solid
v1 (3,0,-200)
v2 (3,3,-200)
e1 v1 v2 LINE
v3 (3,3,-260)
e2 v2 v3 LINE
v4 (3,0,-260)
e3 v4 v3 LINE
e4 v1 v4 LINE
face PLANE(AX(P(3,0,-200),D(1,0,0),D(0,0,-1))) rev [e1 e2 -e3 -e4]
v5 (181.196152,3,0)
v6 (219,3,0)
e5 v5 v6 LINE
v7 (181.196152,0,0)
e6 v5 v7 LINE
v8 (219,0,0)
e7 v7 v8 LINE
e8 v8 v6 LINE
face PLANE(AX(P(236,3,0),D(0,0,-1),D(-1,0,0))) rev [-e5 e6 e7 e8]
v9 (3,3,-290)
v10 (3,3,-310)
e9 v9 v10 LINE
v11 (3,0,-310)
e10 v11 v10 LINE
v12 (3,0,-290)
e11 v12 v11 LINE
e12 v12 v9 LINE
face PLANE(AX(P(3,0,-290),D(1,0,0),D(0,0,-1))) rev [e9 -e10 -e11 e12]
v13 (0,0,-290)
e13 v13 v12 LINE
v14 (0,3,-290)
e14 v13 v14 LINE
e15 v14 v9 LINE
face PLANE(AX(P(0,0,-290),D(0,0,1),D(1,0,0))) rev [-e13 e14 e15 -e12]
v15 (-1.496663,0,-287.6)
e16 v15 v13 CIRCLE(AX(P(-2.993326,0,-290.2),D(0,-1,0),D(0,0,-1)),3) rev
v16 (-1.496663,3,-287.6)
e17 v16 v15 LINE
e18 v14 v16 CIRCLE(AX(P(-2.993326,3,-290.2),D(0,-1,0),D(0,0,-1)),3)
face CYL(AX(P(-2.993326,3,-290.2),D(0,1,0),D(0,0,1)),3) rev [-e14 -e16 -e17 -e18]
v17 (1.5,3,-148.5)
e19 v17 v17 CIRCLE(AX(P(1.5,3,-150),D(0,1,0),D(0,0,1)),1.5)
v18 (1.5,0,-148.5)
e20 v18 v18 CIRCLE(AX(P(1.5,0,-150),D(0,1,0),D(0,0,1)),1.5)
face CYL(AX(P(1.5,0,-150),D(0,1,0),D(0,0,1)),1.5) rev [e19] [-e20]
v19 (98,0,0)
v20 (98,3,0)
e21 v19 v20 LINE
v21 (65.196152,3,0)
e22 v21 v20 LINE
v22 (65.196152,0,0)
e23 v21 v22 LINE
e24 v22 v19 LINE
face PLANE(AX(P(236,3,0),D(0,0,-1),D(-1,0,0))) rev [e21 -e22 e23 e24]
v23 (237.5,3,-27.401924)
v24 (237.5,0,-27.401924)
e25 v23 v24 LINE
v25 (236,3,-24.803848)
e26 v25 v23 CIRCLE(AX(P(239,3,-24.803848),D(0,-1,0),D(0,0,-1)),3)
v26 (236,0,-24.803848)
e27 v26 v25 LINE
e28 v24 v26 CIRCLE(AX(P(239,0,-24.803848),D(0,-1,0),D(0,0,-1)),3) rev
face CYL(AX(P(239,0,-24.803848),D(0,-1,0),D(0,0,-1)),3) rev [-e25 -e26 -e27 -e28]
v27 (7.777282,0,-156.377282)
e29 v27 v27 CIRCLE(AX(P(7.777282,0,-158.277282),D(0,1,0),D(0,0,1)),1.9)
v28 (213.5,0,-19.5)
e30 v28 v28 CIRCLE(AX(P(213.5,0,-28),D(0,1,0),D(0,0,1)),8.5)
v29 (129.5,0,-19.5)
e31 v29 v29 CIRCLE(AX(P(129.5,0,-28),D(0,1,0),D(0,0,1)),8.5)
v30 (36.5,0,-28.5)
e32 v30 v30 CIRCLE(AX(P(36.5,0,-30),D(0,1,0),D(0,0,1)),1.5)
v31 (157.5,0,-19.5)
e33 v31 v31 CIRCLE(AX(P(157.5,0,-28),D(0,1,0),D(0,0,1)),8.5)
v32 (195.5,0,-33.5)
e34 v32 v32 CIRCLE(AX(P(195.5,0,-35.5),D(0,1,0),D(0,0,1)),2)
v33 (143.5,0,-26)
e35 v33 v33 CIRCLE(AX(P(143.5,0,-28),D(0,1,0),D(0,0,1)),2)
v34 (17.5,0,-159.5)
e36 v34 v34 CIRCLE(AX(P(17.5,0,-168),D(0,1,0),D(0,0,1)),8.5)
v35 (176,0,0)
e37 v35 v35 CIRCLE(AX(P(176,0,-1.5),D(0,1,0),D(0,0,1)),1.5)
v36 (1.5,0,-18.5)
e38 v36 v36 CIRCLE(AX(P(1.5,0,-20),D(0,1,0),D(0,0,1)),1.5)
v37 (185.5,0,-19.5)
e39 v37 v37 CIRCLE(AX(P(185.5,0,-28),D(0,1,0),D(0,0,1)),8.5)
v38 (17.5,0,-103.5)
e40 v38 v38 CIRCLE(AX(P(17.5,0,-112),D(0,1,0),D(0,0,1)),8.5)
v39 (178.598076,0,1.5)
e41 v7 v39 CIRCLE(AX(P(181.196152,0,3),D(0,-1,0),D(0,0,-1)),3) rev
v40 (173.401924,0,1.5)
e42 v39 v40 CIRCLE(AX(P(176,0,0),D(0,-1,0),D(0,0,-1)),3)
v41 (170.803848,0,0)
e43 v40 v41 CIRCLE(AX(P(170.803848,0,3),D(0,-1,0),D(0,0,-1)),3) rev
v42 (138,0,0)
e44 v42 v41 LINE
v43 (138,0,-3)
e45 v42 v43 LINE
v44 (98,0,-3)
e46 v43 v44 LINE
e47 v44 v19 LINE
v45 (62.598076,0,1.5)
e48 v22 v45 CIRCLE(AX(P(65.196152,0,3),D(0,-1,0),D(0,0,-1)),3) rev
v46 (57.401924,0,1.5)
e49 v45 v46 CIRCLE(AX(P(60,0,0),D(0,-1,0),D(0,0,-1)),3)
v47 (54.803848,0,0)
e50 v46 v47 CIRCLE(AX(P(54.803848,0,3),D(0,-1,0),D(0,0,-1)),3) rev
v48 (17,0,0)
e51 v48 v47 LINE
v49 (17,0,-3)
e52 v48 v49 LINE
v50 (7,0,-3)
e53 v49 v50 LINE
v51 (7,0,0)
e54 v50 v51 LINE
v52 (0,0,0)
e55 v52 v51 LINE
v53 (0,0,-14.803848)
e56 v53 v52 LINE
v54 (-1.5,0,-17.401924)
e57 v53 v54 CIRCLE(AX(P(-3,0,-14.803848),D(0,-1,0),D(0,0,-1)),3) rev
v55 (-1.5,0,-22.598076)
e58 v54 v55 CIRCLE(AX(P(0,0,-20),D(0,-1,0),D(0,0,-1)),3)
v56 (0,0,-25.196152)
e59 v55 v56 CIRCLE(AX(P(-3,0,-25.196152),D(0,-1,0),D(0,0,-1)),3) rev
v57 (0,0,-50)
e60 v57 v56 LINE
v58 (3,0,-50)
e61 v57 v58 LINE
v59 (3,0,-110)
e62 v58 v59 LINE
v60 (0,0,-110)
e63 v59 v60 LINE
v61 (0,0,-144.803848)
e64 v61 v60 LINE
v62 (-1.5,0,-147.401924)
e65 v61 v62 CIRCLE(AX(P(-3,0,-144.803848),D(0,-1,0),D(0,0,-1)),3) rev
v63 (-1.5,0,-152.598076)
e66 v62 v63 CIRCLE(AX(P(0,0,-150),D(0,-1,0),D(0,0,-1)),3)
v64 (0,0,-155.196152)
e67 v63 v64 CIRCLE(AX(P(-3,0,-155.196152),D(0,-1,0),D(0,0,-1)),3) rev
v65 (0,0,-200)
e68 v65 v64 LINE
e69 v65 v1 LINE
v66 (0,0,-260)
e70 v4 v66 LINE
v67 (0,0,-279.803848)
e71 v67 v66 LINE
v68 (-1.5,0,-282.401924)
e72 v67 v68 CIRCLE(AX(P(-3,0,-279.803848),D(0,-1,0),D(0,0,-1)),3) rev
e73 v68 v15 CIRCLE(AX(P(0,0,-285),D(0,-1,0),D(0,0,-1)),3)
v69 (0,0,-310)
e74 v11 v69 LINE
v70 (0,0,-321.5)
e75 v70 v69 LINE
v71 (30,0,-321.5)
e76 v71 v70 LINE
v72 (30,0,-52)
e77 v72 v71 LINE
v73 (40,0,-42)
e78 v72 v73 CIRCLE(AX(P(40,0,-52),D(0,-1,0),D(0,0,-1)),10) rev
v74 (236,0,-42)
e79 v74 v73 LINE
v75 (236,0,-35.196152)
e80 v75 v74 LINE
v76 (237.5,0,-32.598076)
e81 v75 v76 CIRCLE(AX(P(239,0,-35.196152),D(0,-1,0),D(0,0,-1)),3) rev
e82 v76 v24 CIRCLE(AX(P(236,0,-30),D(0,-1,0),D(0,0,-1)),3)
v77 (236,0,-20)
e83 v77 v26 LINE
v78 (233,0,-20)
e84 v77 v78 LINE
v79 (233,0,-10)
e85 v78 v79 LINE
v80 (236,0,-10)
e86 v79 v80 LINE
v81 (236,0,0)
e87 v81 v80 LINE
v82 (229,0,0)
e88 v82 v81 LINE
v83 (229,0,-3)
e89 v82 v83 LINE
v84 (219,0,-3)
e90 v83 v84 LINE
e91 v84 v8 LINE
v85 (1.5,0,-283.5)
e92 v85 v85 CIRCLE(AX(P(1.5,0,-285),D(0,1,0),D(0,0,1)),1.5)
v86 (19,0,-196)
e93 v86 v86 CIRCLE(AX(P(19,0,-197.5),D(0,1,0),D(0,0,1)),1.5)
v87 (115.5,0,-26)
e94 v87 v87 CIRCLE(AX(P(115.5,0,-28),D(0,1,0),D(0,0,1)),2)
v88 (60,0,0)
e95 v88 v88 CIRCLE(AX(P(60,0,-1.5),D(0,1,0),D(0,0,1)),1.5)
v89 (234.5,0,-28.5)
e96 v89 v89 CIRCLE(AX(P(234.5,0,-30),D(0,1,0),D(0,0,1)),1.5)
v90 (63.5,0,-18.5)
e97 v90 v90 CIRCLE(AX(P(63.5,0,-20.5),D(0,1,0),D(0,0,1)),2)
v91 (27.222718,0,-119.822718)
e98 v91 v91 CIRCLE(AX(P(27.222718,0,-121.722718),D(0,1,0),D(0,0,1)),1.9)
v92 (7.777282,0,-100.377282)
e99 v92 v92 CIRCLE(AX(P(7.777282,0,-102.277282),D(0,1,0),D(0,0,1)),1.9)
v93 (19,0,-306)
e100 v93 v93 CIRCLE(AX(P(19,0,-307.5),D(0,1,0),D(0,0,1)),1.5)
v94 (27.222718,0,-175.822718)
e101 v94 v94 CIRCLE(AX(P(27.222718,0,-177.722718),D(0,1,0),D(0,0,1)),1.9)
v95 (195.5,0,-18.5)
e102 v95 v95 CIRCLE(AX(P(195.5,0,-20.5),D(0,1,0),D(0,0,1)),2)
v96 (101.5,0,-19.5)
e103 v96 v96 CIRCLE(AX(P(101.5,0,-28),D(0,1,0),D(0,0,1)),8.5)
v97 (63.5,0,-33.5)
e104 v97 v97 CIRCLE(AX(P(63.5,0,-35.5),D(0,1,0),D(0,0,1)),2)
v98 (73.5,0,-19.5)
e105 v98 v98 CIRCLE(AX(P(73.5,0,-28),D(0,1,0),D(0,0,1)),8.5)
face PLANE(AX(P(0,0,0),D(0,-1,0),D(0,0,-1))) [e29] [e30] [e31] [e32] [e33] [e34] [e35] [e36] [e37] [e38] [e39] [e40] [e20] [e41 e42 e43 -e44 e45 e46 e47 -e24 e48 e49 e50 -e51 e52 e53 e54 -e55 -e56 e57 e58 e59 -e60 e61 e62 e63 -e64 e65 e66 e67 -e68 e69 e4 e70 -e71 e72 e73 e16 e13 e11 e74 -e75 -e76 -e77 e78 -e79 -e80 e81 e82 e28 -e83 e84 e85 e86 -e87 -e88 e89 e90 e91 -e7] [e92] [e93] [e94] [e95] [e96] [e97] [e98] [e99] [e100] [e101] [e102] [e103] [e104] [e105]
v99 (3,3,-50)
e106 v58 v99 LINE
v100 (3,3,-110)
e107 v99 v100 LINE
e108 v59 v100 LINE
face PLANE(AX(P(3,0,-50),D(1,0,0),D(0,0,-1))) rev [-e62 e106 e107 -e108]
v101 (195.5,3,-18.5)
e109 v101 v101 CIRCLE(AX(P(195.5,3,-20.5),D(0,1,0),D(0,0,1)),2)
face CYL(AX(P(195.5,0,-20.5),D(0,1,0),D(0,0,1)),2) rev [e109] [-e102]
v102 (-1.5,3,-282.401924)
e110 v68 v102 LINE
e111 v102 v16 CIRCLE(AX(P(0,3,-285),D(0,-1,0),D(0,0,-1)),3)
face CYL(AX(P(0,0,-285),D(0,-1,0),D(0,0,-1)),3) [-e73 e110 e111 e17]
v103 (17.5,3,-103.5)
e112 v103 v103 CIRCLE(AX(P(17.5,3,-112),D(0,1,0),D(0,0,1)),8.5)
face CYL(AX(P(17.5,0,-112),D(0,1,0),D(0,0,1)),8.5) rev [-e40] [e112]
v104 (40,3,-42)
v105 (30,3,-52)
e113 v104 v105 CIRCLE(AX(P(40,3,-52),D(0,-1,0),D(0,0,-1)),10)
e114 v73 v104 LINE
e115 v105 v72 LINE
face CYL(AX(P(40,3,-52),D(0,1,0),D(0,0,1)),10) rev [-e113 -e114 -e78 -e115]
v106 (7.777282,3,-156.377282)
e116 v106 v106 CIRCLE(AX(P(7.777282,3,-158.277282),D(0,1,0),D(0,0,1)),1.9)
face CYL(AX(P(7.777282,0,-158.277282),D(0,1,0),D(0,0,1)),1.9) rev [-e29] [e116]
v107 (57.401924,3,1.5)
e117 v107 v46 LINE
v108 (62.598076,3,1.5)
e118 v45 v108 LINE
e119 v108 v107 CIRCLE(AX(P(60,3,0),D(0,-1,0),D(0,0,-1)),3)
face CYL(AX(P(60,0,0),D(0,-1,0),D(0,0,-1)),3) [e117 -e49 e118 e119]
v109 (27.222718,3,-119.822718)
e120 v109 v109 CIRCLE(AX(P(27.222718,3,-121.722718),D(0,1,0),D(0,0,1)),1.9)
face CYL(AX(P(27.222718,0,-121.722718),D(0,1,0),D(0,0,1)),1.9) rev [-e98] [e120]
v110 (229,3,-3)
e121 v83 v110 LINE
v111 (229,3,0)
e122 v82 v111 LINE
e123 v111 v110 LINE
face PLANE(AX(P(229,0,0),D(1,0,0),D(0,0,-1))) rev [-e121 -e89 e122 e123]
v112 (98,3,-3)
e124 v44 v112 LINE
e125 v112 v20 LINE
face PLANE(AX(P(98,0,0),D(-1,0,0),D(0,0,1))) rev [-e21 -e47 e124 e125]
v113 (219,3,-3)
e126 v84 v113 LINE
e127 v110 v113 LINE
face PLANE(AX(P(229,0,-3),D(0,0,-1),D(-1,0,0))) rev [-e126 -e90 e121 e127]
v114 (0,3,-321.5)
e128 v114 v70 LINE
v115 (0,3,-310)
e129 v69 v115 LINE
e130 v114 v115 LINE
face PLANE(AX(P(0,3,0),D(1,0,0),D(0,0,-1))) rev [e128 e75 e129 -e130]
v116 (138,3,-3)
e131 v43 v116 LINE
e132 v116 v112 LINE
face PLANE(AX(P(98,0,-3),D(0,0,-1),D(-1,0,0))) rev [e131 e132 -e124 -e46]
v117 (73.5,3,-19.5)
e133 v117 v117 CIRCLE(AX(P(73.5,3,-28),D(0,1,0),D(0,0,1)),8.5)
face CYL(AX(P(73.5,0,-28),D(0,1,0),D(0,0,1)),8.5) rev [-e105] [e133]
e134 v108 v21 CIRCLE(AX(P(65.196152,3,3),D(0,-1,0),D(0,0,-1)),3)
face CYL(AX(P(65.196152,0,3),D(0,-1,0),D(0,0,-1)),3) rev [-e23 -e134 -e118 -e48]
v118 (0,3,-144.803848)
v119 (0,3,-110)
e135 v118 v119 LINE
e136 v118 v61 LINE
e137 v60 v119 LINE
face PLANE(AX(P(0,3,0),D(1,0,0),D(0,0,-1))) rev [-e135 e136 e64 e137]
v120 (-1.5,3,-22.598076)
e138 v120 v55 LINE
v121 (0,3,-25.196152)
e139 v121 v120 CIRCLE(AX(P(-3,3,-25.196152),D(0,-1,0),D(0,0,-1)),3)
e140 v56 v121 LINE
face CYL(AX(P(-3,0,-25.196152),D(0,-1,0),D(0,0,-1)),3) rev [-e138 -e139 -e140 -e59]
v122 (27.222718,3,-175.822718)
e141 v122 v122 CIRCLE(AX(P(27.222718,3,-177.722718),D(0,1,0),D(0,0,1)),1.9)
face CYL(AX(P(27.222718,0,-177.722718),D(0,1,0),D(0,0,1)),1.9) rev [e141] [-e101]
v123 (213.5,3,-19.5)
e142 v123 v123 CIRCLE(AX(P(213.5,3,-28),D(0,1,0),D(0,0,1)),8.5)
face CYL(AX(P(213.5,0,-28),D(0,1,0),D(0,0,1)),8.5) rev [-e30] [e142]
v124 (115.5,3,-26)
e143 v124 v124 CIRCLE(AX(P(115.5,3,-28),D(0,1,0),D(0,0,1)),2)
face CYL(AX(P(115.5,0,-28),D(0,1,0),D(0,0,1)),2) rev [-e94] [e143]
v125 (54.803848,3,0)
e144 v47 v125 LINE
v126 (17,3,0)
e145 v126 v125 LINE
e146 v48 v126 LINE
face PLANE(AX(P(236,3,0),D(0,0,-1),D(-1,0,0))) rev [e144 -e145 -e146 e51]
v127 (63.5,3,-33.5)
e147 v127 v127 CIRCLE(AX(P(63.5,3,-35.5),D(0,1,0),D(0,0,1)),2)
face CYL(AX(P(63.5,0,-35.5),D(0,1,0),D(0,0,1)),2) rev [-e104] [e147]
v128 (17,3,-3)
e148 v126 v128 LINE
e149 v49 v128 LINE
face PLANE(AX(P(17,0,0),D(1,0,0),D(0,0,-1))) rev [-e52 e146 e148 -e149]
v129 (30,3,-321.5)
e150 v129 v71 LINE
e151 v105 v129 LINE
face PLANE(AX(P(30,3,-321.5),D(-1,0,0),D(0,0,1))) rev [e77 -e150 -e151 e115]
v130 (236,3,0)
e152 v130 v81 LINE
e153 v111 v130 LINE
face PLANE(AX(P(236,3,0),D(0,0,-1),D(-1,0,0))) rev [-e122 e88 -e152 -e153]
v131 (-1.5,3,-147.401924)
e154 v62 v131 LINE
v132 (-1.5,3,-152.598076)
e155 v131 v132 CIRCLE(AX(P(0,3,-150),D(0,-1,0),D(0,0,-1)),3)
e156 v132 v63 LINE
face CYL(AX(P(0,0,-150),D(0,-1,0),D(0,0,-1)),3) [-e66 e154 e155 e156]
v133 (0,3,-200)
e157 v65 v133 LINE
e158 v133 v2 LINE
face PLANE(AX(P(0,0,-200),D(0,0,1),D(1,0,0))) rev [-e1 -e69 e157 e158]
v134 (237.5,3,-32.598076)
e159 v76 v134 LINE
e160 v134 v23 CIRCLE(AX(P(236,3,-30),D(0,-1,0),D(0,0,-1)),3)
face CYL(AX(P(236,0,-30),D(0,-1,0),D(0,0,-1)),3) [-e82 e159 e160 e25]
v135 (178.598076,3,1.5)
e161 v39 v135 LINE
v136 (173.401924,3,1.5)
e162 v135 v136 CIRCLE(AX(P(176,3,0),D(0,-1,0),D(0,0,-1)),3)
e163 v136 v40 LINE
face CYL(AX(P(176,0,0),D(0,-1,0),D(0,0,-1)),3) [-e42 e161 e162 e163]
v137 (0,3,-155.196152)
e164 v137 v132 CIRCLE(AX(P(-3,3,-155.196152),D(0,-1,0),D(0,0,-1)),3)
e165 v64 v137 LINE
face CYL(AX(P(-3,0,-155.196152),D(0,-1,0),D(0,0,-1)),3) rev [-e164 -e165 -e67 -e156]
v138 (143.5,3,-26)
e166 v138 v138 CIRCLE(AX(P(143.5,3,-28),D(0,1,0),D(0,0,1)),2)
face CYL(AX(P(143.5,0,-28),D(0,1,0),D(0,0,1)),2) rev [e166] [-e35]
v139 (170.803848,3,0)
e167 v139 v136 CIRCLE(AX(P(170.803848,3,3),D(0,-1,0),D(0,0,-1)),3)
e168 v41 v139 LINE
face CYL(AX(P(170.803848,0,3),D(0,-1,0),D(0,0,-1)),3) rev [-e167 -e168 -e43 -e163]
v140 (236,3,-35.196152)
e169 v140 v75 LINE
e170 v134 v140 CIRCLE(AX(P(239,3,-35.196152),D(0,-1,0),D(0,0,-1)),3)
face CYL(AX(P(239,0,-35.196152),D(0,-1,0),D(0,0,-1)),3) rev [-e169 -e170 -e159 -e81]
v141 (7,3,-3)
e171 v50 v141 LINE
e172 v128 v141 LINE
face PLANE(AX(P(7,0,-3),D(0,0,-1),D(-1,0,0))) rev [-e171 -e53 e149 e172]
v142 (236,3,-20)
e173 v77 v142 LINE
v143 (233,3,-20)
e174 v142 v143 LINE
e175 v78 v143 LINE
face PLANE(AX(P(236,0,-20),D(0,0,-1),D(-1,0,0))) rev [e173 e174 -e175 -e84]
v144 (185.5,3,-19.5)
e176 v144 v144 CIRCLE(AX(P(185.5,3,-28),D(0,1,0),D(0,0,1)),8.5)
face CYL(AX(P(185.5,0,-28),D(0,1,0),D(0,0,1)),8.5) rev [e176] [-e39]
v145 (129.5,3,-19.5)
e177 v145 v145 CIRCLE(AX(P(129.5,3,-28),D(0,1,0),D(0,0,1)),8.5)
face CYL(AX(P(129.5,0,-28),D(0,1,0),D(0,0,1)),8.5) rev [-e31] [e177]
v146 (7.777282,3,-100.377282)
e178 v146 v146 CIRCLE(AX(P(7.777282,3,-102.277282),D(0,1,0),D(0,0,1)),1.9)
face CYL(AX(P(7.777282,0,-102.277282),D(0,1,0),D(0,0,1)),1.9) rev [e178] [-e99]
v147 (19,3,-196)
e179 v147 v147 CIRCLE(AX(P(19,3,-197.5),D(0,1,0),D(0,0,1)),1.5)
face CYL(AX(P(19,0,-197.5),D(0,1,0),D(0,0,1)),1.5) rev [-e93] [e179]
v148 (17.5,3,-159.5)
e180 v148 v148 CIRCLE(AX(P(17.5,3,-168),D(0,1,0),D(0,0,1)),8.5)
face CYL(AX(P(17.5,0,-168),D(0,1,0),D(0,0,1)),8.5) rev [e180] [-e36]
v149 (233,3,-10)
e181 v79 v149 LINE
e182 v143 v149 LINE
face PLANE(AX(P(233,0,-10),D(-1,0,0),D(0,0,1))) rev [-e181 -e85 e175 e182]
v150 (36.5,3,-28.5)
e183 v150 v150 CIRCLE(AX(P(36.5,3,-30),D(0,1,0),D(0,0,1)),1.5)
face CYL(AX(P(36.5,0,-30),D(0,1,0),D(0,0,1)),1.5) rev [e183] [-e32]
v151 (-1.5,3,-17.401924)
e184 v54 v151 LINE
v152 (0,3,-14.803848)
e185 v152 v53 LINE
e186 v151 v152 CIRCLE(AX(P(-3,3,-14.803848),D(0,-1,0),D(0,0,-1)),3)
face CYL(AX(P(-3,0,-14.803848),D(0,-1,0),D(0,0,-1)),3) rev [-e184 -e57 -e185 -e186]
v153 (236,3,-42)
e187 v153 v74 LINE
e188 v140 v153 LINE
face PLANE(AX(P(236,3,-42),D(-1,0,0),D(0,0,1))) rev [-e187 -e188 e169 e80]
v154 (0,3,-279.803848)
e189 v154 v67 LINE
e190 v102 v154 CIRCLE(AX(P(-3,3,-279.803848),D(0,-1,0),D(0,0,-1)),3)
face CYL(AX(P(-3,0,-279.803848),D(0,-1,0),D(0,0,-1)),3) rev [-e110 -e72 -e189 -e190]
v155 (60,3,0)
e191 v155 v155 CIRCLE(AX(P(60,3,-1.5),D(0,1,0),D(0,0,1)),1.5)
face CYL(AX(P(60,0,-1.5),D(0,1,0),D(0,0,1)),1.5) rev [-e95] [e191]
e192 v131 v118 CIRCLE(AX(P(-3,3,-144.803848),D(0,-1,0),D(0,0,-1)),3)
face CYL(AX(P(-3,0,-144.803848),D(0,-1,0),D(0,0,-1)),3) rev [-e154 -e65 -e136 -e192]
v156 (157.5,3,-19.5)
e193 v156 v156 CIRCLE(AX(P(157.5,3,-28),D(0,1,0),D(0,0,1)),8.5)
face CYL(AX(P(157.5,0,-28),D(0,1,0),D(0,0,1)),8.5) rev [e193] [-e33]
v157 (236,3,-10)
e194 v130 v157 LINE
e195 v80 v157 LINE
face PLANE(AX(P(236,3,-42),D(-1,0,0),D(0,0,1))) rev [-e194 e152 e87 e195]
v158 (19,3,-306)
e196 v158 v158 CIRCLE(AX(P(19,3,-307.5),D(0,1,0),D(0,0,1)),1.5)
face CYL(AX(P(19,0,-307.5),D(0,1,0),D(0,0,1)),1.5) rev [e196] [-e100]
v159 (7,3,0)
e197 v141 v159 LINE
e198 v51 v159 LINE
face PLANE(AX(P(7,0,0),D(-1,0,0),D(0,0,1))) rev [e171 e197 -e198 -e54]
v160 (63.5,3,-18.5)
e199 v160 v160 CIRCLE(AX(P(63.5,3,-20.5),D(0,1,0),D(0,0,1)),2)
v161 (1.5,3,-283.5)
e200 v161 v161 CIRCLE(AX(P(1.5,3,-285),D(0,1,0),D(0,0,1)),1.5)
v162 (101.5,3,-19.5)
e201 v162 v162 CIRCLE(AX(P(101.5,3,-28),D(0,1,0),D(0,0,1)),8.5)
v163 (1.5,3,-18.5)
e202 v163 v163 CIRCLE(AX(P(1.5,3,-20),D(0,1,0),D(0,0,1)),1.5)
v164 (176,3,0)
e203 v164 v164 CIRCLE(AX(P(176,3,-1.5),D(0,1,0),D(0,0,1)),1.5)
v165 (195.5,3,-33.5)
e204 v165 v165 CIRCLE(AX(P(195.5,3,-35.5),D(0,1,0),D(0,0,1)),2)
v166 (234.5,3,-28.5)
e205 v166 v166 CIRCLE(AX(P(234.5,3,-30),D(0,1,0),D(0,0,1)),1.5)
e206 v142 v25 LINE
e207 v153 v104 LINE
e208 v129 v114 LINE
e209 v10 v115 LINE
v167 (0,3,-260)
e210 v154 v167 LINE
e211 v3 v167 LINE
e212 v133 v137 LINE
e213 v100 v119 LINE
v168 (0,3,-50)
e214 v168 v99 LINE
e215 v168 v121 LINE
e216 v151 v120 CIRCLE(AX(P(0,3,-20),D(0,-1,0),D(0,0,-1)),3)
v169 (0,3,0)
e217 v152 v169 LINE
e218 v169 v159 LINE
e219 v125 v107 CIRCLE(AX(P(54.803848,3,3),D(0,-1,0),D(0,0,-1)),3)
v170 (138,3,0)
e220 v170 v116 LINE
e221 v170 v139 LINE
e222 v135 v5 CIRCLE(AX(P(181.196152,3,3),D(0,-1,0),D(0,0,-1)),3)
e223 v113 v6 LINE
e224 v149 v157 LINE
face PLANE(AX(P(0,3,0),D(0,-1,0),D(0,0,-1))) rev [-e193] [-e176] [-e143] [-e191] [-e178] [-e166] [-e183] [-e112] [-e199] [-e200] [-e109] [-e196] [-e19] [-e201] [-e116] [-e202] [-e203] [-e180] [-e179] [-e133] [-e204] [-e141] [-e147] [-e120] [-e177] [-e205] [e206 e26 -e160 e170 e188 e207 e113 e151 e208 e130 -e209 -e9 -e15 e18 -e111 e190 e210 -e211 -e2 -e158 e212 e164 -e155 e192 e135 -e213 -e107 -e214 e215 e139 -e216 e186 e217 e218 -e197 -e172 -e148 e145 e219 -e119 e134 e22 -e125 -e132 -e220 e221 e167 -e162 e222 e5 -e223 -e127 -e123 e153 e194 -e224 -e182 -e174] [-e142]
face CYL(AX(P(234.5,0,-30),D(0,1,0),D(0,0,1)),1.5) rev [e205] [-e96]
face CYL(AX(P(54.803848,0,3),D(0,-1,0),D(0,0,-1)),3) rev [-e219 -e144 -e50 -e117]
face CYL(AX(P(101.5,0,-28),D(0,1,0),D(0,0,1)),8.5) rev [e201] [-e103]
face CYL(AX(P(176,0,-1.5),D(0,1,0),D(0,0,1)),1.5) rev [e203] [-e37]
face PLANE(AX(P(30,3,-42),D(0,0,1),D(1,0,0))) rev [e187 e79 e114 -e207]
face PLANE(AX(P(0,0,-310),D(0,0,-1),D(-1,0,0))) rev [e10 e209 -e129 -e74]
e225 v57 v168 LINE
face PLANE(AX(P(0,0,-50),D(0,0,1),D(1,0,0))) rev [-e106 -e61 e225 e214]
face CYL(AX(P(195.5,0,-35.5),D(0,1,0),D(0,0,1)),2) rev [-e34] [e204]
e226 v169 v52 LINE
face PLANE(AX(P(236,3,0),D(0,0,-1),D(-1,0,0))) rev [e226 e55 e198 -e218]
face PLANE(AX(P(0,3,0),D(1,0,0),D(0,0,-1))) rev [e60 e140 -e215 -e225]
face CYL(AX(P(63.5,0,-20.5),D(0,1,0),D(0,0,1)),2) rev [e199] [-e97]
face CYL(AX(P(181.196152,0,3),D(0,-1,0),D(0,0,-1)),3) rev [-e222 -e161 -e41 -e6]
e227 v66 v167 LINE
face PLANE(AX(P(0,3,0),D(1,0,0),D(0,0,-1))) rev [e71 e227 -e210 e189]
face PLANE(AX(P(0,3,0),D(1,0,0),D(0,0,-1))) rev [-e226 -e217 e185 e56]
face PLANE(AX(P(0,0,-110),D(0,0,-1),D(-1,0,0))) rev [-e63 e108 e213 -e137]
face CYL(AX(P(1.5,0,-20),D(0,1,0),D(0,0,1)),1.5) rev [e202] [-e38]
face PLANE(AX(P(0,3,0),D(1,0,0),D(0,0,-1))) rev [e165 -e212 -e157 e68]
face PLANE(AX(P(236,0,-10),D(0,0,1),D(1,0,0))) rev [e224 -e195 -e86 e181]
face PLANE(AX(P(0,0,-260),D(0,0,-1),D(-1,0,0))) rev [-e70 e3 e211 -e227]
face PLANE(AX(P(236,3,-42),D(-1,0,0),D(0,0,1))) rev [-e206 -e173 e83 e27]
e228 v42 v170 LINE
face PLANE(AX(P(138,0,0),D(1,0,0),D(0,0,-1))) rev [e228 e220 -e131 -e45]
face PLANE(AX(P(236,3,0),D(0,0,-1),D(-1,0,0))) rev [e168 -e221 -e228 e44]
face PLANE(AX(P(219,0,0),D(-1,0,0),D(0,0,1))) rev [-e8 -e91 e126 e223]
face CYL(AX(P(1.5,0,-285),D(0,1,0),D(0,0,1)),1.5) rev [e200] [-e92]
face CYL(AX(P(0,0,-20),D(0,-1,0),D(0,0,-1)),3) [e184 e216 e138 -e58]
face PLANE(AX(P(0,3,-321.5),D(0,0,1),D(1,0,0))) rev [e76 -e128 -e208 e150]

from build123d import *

# Parameters (mm, degrees)
EXTRUDE_1_DEPTH        = 3
SKETCH_2_W             = 3
SKETCH_2_H             = 10
CUT_EXTRUDE_1_DEPTH    = 3
SKETCH_4_W             = 3
SKETCH_4_H             = 3
FILLET_1_R             = 3
SKETCH_5_R             = 1.5
CUT_EXTRUDE_2_DEPTH    = 3
SKETCH_6_W             = 10
SKETCH_6_H             = 3
CUT_EXTRUDE_3_DEPTH    = 3
SKETCH_7_W             = 40
SKETCH_7_H             = 3
CUT_EXTRUDE_4_DEPTH    = 3
SKETCH_9_W             = 3
SKETCH_9_H             = 60
SKETCH_9_H_2           = 20
CUT_EXTRUDE_5_DEPTH    = 3
SKETCH_11_W            = 3
SKETCH_11_H            = 3
SKETCH_12_W            = 3
SKETCH_12_H            = 3
SKETCH_13_R            = 1.5
CUT_EXTRUDE_6_DEPTH    = 3
FILLET_2_R             = 3
SKETCH_14_W            = 3
SKETCH_14_H            = 3
SKETCH_15_W            = 3
SKETCH_15_H            = 3
SKETCH_16_W            = 3
SKETCH_16_H            = 3
FILLET_3_R             = 3
SKETCH_17_R            = 1.5
CUT_EXTRUDE_7_DEPTH    = 3
SKETCH_18_R            = 8.5
CUT_EXTRUDE_8_DEPTH    = 3
PATTERN_LINEAR_2_COUNT = 6
PATTERN_LINEAR_2_PITCH = 28
SKETCH_19_R            = 8.5
CUT_EXTRUDE_9_DEPTH    = 3
SKETCH_20_R            = 8.5
CUT_EXTRUDE_10_DEPTH   = 3
FILLET_4_R             = 10
SKETCH_21_R            = 2
CUT_EXTRUDE_11_DEPTH   = 3
SKETCH_22_R            = 1.9
CUT_EXTRUDE_12_DEPTH   = 3
SKETCH_23_R            = 1.5
CUT_EXTRUDE_13_DEPTH   = 3
SKETCH_24_R            = 1.5
CUT_EXTRUDE_14_DEPTH   = 3


with BuildPart() as part:
    # Эскиз1 → Бобышка-Вытянуть1 (new body)
    with BuildSketch(Plane(origin=(0, 0, 0), x_dir=(1, 0, 0), z_dir=(0, 1, 0))):
        Polygon((0, 0), (0, 321.5), (30, 321.5), (30, 42), (236, 42), (236, 0), align=None)
    extrude(amount=EXTRUDE_1_DEPTH)

    # Эскиз2 → Вырез-Вытянуть1 (cut)
    with BuildSketch(Plane(origin=(0, 3, 0), x_dir=(1, 0, 0), z_dir=(0, 1, 0))):
        with Locations((234.5, 15)):
            Rectangle(SKETCH_2_W, SKETCH_2_H)
    extrude(amount=-CUT_EXTRUDE_1_DEPTH, mode=Mode.SUBTRACT)

    # Эскиз4 → Повернуть1 (revolve)
    with BuildSketch(Plane(origin=(236, 0, 0), x_dir=(0, 0, -1), z_dir=(1, 0, 0))):
        with Locations((31.5, 1.5)):
            Rectangle(SKETCH_4_W, SKETCH_4_H)
    revolve(axis=Axis((236, 0, -30), (0, 1, 0)))

    # Скругление1
    fillet_1_edges = [part.edges().sort_by_distance(p)[0] for p in [
        (236, 1.5, -33),
        (236, 1.5, -27),
    ]]
    fillet(fillet_1_edges, radius=FILLET_1_R)

    # Эскиз5 → Вырез-Вытянуть2 (cut)
    with BuildSketch(Plane(origin=(0, 3, 0), x_dir=(1, 0, 0), z_dir=(0, 1, 0))):
        with Locations(Location((234.5, 30, 0), (0, 0, 270))):
            Circle(SKETCH_5_R)
    extrude(amount=-CUT_EXTRUDE_2_DEPTH, mode=Mode.SUBTRACT)

    # Эскиз6 → Вырез-Вытянуть3 (cut)
    with BuildSketch(Plane(origin=(0, 3, 0), x_dir=(1, 0, 0), z_dir=(0, 1, 0))):
        with Locations((224, 1.5)):
            Rectangle(SKETCH_6_W, SKETCH_6_H)
        with Locations((12, 1.5)):
            Rectangle(SKETCH_6_W, SKETCH_6_H)
    extrude(amount=-CUT_EXTRUDE_3_DEPTH, mode=Mode.SUBTRACT)

    # Эскиз7 → Вырез-Вытянуть4 (cut)
    with BuildSketch(Plane(origin=(0, 3, 0), x_dir=(1, 0, 0), z_dir=(0, 1, 0))):
        with Locations((118, 1.5)):
            Rectangle(SKETCH_7_W, SKETCH_7_H)
    extrude(amount=-CUT_EXTRUDE_4_DEPTH, mode=Mode.SUBTRACT)

    # Эскиз9 → Вырез-Вытянуть5 (cut)
    with BuildSketch(Plane(origin=(0, 3, 0), x_dir=(1, 0, 0), z_dir=(0, 1, 0))):
        with Locations((1.5, 80)):
            Rectangle(SKETCH_9_W, SKETCH_9_H)
        with Locations((1.5, 230)):
            Rectangle(SKETCH_9_W, SKETCH_9_H)
        with Locations((1.5, 300)):
            Rectangle(SKETCH_9_W, SKETCH_9_H_2)
    extrude(amount=-CUT_EXTRUDE_5_DEPTH, mode=Mode.SUBTRACT)

    # Эскиз11 → Повернуть2 (revolve)
    with BuildSketch(Plane.XY):
        with Locations((61.5, 1.5)):
            Rectangle(SKETCH_11_W, SKETCH_11_H)
    revolve(axis=Axis((60, 0, 0), (0, 1, 0)))

    # Эскиз12 → Повернуть3 (revolve)
    with BuildSketch(Plane.XY):
        with Locations((174.5, 1.5)):
            Rectangle(SKETCH_12_W, SKETCH_12_H)
    revolve(axis=Axis((176, 0, 0), (0, 1, 0)))

    # Эскиз13 → Вырез-Вытянуть6 (cut)
    with BuildSketch(Plane(origin=(0, 3, 0), x_dir=(1, 0, 0), z_dir=(0, 1, 0))):
        with Locations(Location((60, 1.5, 0), (0, 0, 270))):
            Circle(SKETCH_13_R)
        with Locations(Location((176, 1.5, 0), (0, 0, 270))):
            Circle(SKETCH_13_R)
    extrude(amount=-CUT_EXTRUDE_6_DEPTH, mode=Mode.SUBTRACT)

    # Скругление2
    fillet_2_edges = [part.edges().sort_by_distance(p)[0] for p in [
        (63, 1.5, 0),
        (57, 1.5, 0),
        (179, 1.5, 0),
        (173, 1.5, 0),
    ]]
    fillet(fillet_2_edges, radius=FILLET_2_R)

    # Эскиз14 → Повернуть4 (revolve)
    with BuildSketch(Plane.ZY):
        with Locations((-286.5, 1.5)):
            Rectangle(SKETCH_14_W, SKETCH_14_H)
    revolve(axis=Axis((0, 0, -285), (0, 1, 0)))

    # Эскиз15 → Повернуть5 (revolve)
    with BuildSketch(Plane.ZY):
        with Locations((-151.5, 1.5)):
            Rectangle(SKETCH_15_W, SKETCH_15_H)
    revolve(axis=Axis((0, 0, -150), (0, 1, 0)))

    # Эскиз16 → Повернуть6 (revolve)
    with BuildSketch(Plane.ZY):
        with Locations((-21.5, 1.5)):
            Rectangle(SKETCH_16_W, SKETCH_16_H)
    revolve(axis=Axis((0, 0, -20), (0, 1, 0)))

    # Скругление3
    # the kernel refuses this fillet: 3 mm, written as the material it adds along each edge
    with BuildSketch(Plane(origin=(0, 3, -282), x_dir=(-0.9659258262890682, 0, -0.2588190451025208), z_dir=(0, -1, 0)), Plane(origin=(0, 3, -147), x_dir=(-0.9659258262890682, 0, -0.2588190451025208), z_dir=(0, -1, 0))) as fillet_3_piece_1:
        with BuildLine():
            CenterArc((2.329371406, -2.897777479), FILLET_3_R, 105, 60)
            Line((-0.568406073, -2.121320344), (-0.626361623, -2.105791201))
            Line((-0.626361623, -2.105791201), (-0.05795555, 0.015529143))
            Line((-0.05795555, 0.015529143), (0.015529143, 0.05795555))
            ThreePointArc((0.015529143, 0.05795555), (0.776457135, -0.042222521), (1.537385128, 0.05795555))
            Line((1.537385128, 0.05795555), (1.552914271, 0))
        make_face()
    extrude(amount=3)
    with BuildSketch(Plane(origin=(0, 3, -288), x_dir=(0, 0, -1), z_dir=(0, -1, 0))) as fillet_3_piece_2:
        with BuildLine():
            CenterArc((2.2, -2.993325909), FILLET_3_R, 93.822553729, 56.251011404)
            Line((-0.4, -1.496662955), (-0.452, -1.466729696))
            ThreePointArc((-0.452, -1.466729696), (-0.159690158, -0.759104736), (-0.06, 0))
            Line((-0.06, 0), (0, 0.06))
            ThreePointArc((0, 0.06), (1, 0.06), (1.996, 0.059866518))
            Line((1.996, 0.059866518), (2, 0))
        make_face()
    extrude(amount=3)
    with BuildSketch(Plane(origin=(0, 3, -153), x_dir=(0, 0, -1), z_dir=(0, -1, 0)), Plane(origin=(0, 3, -23), x_dir=(0, 0, -1), z_dir=(0, -1, 0))) as fillet_3_piece_3:
        with BuildLine():
            CenterArc((2.196152423, -3), FILLET_3_R, 90, 60)
            Line((-0.401923789, -1.5), (-0.453885313, -1.47))
            ThreePointArc((-0.453885313, -1.47), (-0.160178071, -0.760927993), (-0.06, 0))
            Line((-0.06, 0), (0, 0.06))
            Line((0, 0.06), (2.196152423, 0.06))
            Line((2.196152423, 0.06), (2.196152423, 0))
        make_face()
    extrude(amount=3)
    with BuildSketch(Plane(origin=(0, 3, -17), x_dir=(0, 0, 1), z_dir=(0, -1, 0))) as fillet_3_piece_4:
        with BuildLine():
            CenterArc((2.196152423, 3), FILLET_3_R, 210, 60)
            Line((-0.401923789, 1.5), (-0.453885313, 1.47))
            ThreePointArc((-0.453885313, 1.47), (-0.160178071, 0.760927993), (-0.06, 0))
            Line((-0.06, 0), (0, -0.06))
            Line((0, -0.06), (2.196152423, -0.06))
            Line((2.196152423, -0.06), (2.196152423, 0))
        make_face()
    extrude(amount=3)

    # Эскиз17 → Вырез-Вытянуть7 (cut)
    with BuildSketch(Plane(origin=(0, 3, 0), x_dir=(1, 0, 0), z_dir=(0, 1, 0))):
        with Locations(Location((1.5, 20, 0), (0, 0, 270))):
            Circle(SKETCH_17_R)
        with Locations(Location((1.5, 150, 0), (0, 0, 270))):
            Circle(SKETCH_17_R)
        with Locations(Location((1.5, 285, 0), (0, 0, 270))):
            Circle(SKETCH_17_R)
    extrude(amount=-CUT_EXTRUDE_7_DEPTH, mode=Mode.SUBTRACT)

    # Эскиз18 → Вырез-Вытянуть8 (cut)
    with BuildSketch(Plane(origin=(0, 3, 0), x_dir=(1, 0, 0), z_dir=(0, 1, 0))):
        with Locations(Location((213.5, 28, 0), (0, 0, 270))):
            Circle(SKETCH_18_R)
    cut_extrude_8 = extrude(amount=-CUT_EXTRUDE_8_DEPTH, mode=Mode.SUBTRACT)

    # Линейный массив2: Вырез-Вытянуть8 ×6
    with Locations(*[(-i * PATTERN_LINEAR_2_PITCH, 0, 0) for i in range(1, PATTERN_LINEAR_2_COUNT)]):
        add(cut_extrude_8, mode=Mode.SUBTRACT)

    # Эскиз19 → Вырез-Вытянуть9 (cut)
    with BuildSketch(Plane(origin=(0, 3, 0), x_dir=(1, 0, 0), z_dir=(0, 1, 0))):
        with Locations(Location((17.5, 112, 0), (0, 0, 270))):
            Circle(SKETCH_19_R)
    extrude(amount=-CUT_EXTRUDE_9_DEPTH, mode=Mode.SUBTRACT)

    # Эскиз20 → Вырез-Вытянуть10 (cut)
    with BuildSketch(Plane(origin=(0, 3, 0), x_dir=(1, 0, 0), z_dir=(0, 1, 0))):
        with Locations(Location((17.5, 168, 0), (0, 0, 270))):
            Circle(SKETCH_20_R)
    extrude(amount=-CUT_EXTRUDE_10_DEPTH, mode=Mode.SUBTRACT)

    # Скругление4
    fillet_4_edges = [part.edges().sort_by_distance(p)[0] for p in [
        (30, 1.5, -42),
    ]]
    fillet(fillet_4_edges, radius=FILLET_4_R)

    # Эскиз21 → Вырез-Вытянуть11 (cut)
    with BuildSketch(Plane(origin=(0, 3, 0), x_dir=(1, 0, 0), z_dir=(0, 1, 0))):
        with Locations(Location((115.5, 28, 0), (0, 0, 270))):
            Circle(SKETCH_21_R)
        with Locations(Location((143.5, 28, 0), (0, 0, 270))):
            Circle(SKETCH_21_R)
        with Locations(Location((195.5, 35.5, 0), (0, 0, 270))):
            Circle(SKETCH_21_R)
        with Locations(Location((195.5, 20.5, 0), (0, 0, 270))):
            Circle(SKETCH_21_R)
        with Locations(Location((63.5, 35.5, 0), (0, 0, 270))):
            Circle(SKETCH_21_R)
        with Locations(Location((63.5, 20.5, 0), (0, 0, 270))):
            Circle(SKETCH_21_R)
    extrude(amount=-CUT_EXTRUDE_11_DEPTH, mode=Mode.SUBTRACT)

    # Эскиз22 → Вырез-Вытянуть12 (cut)
    with BuildSketch(Plane(origin=(0, 3, 0), x_dir=(1, 0, 0), z_dir=(0, 1, 0))):
        with Locations(Location((27.222718241, 121.722718241, 0), (0, 0, 270))):
            Circle(SKETCH_22_R)
        with Locations(Location((7.777281759, 102.277281759, 0), (0, 0, 270))):
            Circle(SKETCH_22_R)
        with Locations(Location((27.222718241, 177.722718241, 0), (0, 0, 270))):
            Circle(SKETCH_22_R)
        with Locations(Location((7.777281759, 158.277281759, 0), (0, 0, 270))):
            Circle(SKETCH_22_R)
    extrude(amount=-CUT_EXTRUDE_12_DEPTH, mode=Mode.SUBTRACT)

    # Эскиз23 → Вырез-Вытянуть13 (cut)
    with BuildSketch(Plane(origin=(0, 3, 0), x_dir=(1, 0, 0), z_dir=(0, 1, 0))):
        with Locations(Location((19, 307.5, 0), (0, 0, 270))):
            Circle(SKETCH_23_R)
        with Locations(Location((19, 197.5, 0), (0, 0, 270))):
            Circle(SKETCH_23_R)
    extrude(amount=-CUT_EXTRUDE_13_DEPTH, mode=Mode.SUBTRACT)

    # Эскиз24 → Вырез-Вытянуть14 (cut)
    with BuildSketch(Plane(origin=(0, 3, 0), x_dir=(1, 0, 0), z_dir=(0, 1, 0))):
        with Locations(Location((36.5, 30, 0), (0, 0, 270))):
            Circle(SKETCH_24_R)
    extrude(amount=-CUT_EXTRUDE_14_DEPTH, mode=Mode.SUBTRACT)


solid = part.part
